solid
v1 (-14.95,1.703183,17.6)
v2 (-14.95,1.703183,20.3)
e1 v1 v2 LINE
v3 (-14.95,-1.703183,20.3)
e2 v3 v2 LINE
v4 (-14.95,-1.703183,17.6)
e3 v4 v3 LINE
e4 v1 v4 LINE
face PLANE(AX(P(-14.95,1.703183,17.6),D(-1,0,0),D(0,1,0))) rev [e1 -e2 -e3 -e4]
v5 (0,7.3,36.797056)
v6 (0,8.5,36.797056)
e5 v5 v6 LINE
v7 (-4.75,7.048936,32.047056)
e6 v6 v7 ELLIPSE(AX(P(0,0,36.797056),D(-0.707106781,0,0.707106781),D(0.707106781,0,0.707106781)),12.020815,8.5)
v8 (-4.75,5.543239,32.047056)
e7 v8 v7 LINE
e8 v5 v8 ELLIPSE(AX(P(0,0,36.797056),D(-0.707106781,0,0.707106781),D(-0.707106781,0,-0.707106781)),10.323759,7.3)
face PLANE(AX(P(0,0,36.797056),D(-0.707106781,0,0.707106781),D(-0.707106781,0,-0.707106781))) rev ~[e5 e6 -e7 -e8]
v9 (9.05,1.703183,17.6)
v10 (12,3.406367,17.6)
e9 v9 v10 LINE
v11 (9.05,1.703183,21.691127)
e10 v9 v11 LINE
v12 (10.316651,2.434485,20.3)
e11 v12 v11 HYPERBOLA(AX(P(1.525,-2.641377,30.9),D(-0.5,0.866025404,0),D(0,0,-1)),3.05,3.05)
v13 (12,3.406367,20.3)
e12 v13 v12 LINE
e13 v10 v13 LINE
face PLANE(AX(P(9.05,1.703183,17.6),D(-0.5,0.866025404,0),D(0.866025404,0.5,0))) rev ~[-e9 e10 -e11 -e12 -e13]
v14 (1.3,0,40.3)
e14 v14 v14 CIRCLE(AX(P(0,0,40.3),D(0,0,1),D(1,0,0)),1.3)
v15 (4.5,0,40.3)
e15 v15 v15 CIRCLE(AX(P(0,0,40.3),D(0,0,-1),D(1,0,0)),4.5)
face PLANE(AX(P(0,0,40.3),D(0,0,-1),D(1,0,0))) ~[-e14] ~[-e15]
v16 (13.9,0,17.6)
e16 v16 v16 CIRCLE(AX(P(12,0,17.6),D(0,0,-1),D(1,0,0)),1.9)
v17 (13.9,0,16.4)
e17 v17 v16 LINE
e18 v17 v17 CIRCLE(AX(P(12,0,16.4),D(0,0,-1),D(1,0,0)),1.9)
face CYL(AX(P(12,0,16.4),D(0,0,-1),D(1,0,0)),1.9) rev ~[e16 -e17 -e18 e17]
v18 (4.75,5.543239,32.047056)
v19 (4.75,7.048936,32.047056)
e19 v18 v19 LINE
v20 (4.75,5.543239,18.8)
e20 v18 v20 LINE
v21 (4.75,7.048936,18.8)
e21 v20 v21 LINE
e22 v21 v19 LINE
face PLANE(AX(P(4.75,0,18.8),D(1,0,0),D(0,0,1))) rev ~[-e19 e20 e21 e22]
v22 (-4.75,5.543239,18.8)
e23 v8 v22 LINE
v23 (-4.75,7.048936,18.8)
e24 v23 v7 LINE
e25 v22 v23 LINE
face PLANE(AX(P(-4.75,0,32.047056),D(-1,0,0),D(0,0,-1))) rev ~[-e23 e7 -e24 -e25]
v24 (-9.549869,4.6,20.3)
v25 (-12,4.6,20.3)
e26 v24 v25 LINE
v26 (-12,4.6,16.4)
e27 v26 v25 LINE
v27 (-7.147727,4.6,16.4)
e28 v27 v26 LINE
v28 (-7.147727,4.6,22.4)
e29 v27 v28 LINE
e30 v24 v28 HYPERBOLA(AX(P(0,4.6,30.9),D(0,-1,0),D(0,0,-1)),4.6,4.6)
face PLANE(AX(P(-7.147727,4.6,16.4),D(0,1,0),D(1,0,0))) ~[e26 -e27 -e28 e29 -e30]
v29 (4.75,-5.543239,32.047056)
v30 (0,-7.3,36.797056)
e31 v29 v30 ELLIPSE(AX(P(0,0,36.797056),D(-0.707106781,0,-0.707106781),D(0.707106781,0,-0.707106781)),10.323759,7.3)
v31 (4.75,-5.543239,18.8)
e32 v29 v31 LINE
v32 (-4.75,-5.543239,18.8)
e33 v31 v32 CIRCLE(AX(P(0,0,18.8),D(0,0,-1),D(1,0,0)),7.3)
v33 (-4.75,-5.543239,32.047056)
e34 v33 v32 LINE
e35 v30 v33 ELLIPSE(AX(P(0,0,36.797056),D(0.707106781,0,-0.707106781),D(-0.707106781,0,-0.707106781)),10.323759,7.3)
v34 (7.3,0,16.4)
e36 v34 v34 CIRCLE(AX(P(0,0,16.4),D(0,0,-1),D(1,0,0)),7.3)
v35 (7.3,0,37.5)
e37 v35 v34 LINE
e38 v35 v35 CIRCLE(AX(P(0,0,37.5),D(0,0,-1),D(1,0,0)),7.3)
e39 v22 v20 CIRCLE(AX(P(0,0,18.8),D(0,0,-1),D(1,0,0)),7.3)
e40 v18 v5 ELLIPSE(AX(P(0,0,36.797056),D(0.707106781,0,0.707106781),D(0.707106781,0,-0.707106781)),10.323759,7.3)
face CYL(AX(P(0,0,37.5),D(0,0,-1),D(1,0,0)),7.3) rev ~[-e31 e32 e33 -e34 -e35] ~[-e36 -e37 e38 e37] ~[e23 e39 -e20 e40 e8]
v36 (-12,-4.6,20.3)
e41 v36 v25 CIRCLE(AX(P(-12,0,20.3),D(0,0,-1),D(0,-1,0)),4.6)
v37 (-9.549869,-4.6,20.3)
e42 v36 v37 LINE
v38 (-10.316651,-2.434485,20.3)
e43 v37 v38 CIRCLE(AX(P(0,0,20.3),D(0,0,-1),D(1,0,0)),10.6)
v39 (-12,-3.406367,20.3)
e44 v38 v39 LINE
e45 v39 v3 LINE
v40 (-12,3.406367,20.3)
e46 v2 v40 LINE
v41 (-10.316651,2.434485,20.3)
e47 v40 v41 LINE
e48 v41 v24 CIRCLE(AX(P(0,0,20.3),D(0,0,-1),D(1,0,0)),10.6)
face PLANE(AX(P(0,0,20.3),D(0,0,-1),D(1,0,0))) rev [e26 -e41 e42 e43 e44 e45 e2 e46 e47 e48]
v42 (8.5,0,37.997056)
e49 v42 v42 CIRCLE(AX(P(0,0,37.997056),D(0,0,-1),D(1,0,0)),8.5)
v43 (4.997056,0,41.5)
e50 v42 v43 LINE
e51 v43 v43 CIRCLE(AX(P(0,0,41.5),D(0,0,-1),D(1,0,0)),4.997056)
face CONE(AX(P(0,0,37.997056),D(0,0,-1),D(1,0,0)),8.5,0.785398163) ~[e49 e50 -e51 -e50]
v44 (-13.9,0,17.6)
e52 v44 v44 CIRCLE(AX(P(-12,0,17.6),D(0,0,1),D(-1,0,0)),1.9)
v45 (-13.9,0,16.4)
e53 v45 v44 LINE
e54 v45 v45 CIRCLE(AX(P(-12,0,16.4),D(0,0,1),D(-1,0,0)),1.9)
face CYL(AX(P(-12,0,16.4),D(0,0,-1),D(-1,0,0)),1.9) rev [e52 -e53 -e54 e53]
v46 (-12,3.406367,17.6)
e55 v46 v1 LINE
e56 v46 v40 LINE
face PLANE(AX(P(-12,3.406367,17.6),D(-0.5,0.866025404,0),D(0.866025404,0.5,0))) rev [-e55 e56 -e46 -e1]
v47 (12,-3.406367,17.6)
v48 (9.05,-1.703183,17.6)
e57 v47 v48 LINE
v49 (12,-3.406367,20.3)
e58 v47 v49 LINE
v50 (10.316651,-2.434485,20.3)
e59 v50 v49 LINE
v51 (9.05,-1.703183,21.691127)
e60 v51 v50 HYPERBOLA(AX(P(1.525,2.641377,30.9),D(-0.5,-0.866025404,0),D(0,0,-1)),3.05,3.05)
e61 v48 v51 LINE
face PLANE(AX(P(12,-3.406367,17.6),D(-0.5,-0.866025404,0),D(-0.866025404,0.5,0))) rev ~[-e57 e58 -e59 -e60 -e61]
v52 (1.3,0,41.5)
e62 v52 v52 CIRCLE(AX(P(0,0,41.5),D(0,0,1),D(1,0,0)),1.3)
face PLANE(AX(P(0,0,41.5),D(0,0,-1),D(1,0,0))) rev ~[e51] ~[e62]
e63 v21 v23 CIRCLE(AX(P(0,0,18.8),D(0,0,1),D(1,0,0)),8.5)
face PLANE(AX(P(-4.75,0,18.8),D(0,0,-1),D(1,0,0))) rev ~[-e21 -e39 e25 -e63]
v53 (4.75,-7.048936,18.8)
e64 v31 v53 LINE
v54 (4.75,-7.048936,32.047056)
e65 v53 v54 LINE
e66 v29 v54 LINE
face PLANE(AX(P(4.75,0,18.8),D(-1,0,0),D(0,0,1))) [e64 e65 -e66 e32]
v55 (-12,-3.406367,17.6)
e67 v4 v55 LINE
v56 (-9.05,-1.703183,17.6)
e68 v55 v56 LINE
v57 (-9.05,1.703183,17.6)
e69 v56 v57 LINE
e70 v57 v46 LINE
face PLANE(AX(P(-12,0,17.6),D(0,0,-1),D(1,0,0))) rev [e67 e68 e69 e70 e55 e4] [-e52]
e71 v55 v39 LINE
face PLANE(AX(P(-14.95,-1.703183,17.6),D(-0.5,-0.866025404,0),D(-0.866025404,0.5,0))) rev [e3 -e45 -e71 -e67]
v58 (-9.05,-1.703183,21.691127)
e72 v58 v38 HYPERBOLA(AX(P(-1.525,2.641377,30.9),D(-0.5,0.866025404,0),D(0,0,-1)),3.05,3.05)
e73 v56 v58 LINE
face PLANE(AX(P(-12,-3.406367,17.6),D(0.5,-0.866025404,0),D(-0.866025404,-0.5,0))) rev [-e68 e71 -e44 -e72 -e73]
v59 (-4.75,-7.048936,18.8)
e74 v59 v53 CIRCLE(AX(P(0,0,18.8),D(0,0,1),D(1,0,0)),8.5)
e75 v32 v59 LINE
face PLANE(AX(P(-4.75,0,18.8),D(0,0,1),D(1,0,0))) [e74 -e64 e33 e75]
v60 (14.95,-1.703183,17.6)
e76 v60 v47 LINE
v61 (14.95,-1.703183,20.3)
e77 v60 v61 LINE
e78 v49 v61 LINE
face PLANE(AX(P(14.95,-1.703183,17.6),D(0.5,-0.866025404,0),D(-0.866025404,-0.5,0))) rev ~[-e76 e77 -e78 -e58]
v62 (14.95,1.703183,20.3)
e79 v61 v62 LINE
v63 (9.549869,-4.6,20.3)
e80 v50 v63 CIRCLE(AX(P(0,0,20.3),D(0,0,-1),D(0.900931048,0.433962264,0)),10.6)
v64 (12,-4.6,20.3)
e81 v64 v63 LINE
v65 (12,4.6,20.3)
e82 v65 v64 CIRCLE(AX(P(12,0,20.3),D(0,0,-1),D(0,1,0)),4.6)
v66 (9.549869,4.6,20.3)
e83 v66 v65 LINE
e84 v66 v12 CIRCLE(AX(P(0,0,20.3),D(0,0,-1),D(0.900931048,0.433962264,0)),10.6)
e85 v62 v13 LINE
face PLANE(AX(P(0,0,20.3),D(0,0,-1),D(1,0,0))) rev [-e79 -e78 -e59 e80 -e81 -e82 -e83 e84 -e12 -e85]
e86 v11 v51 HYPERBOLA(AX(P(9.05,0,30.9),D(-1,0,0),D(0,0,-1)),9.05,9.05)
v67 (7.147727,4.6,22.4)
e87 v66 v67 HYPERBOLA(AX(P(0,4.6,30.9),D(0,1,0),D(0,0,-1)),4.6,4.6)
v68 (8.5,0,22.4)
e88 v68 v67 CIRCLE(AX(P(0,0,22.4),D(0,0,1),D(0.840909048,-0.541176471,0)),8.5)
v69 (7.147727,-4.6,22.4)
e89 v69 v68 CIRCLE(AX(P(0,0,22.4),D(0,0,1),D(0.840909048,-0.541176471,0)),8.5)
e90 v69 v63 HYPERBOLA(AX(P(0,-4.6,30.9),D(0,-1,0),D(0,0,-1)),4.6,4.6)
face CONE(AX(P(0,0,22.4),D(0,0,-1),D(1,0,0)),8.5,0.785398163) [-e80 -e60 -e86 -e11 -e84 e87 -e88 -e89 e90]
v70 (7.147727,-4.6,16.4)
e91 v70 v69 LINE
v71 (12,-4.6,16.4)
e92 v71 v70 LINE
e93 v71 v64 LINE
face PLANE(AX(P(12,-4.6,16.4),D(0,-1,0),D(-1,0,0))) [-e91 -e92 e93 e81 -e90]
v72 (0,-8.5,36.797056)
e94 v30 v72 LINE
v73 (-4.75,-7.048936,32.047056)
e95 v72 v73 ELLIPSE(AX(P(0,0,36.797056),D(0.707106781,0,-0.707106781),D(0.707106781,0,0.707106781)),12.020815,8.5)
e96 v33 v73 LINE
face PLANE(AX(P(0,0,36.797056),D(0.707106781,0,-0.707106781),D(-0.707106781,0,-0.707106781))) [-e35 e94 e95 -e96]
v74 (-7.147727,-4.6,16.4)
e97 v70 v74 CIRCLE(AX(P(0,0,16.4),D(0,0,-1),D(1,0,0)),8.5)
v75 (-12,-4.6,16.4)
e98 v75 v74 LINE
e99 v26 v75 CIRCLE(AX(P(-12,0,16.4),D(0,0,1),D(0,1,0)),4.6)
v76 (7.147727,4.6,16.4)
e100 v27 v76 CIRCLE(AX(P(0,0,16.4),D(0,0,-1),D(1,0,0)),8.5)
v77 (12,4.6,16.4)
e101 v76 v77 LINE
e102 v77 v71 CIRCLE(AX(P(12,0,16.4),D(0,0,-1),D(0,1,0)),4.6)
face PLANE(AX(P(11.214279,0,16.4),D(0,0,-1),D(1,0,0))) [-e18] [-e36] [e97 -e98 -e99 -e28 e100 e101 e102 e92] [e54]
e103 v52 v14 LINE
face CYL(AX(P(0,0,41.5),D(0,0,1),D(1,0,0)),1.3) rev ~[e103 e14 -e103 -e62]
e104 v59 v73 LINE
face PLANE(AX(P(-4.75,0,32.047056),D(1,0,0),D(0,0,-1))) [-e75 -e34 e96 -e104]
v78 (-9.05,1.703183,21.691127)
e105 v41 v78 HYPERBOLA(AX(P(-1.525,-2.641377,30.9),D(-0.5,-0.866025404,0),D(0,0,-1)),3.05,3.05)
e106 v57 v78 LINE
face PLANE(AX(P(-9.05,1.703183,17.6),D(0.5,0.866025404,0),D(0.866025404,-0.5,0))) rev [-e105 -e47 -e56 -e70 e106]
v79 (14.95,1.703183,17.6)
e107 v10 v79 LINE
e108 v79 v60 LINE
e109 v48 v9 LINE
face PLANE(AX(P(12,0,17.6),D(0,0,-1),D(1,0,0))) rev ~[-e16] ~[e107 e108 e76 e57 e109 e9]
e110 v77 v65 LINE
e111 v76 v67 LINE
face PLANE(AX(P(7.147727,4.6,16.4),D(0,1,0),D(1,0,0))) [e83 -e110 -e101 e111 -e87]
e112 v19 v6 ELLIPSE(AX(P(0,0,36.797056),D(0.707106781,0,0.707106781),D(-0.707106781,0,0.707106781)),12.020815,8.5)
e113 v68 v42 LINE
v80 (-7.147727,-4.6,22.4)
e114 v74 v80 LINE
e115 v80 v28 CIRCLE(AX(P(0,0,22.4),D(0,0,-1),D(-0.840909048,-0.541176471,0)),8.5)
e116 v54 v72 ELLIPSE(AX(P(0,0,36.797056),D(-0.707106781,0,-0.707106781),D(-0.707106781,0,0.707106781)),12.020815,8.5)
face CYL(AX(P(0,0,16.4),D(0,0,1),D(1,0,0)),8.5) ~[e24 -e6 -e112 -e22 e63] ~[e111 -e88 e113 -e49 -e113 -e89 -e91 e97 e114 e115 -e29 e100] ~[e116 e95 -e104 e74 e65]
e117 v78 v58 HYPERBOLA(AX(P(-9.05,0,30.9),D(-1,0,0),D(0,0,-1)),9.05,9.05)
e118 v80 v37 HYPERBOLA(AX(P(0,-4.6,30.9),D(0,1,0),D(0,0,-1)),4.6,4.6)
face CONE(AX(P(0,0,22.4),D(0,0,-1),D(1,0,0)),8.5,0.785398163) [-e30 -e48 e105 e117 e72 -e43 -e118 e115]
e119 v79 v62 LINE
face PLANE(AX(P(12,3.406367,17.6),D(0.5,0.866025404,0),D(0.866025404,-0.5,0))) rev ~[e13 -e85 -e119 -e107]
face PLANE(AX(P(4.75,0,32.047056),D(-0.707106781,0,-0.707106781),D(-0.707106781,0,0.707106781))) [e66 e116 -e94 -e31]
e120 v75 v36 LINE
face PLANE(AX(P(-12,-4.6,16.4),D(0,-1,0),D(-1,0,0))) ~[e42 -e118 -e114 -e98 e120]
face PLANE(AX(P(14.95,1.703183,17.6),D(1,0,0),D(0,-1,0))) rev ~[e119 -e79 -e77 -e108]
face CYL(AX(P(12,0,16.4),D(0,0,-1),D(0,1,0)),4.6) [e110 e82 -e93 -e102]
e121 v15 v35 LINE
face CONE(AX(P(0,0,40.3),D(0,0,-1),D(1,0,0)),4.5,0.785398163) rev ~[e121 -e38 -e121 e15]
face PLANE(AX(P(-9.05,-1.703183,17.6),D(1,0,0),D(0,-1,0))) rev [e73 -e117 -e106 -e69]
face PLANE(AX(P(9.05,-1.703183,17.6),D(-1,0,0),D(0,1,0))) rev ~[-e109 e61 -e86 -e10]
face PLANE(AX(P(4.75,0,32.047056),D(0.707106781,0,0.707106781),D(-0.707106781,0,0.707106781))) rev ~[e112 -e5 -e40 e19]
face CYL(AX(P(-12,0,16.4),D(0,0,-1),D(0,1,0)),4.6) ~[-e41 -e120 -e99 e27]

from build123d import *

# Parameters (mm, degrees)
F4_DEPTH       = 6
F9_DEPTH       = 4.251
F10_R          = 1.9
F11_DEPTH      = 1.2
F13_DEPTH      = 8.501
F13_DEPTH_BACK = 8.501
F15_R          = 1.3
F16_DEPTH      = 1.2


# Not quite as in the source:
# - a pattern or mirror of a feature is missing from the dataset's text; its kind, count and spacing are read off the source's solid


with BuildPart() as f2:
    # F1 (on Front) → F2 (revolve)
    with BuildSketch(Plane.XZ):
        Polygon((7.3, 37.5), (7.3, 16.4), (8.5, 16.4), (8.5, 37.9970562748), (4.9970562748, 41.5), (0, 41.5), (0, 40.3), (4.5, 40.3), align=None)
    revolve(axis=Axis((0, 0, 13.2), (0, 0, -1)))

    # F3 (on face) → F4 (join)
    with BuildSketch(Plane(origin=(0, 0, 16.4), x_dir=(1, 0, 0), z_dir=(0, 0, -1))):
        with BuildLine():
            Line((7.1477269114, -4.6), (12, -4.6))
            ThreePointArc((12, -4.6), (16.6, 0), (12, 4.6))
            Line((12, 4.6), (7.1477269114, 4.6))
            ThreePointArc((7.1477269114, 4.6), (8.5, 0), (7.1477269114, -4.6))
        make_face()
    f4 = extrude(amount=-F4_DEPTH)

    # F4_copies: F4 across plane
    add(f4.mirror(Plane(origin=(0, 0, 0), x_dir=(0, 0, -1), z_dir=(-1, 0, 0))))

    # F7 (on Front) → F8 (revolve, cut)
    with BuildSketch(Plane.XZ):
        Polygon((8.5, 22.4), (10.6, 20.3), (16.6, 20.3), (16.6, 22.4), align=None)
    revolve(axis=Axis((0, 0, 13.2), (0, 0, -1)), mode=Mode.SUBTRACT)

    # F6 (on offset) → F9 (cut, through all)
    with BuildSketch(Plane(origin=(0, 0, 17.6), x_dir=(1, 0, 0), z_dir=(0, 0, -1))):
        Polygon((12, -3.4063665882), (14.95, -1.7031832941), (14.95, 1.7031832941), (12, 3.4063665882), (9.05, 1.7031832941), (9.05, -1.7031832941), align=None)
    f9 = extrude(amount=-F9_DEPTH, mode=Mode.SUBTRACT)

    # F9_copies: F9 across plane
    add(f9.mirror(Plane(origin=(0, 0, 0), x_dir=(0, 0, -1), z_dir=(-1, 0, 0))), mode=Mode.SUBTRACT)

    # F10 (on face) → F11 (cut, through all)
    with BuildSketch(Plane(origin=(0, 0, 16.4), x_dir=(1, 0, 0), z_dir=(0, 0, -1))):
        with Locations((12, 0)):
            Circle(F10_R)
    f11 = extrude(amount=-F11_DEPTH, mode=Mode.SUBTRACT)

    # F11_copies: F11 across plane
    add(f11.mirror(Plane(origin=(0, 0, 0), x_dir=(0, 0, -1), z_dir=(-1, 0, 0))), mode=Mode.SUBTRACT)

    # F12 (on Front) → F13 (cut, two sides)
    with BuildSketch(Plane.XZ) as f13_sk:
        Polygon((-4.75, 32.0470562748), (-4.75, 18.8), (4.75, 18.8), (4.75, 32.0470562748), (0, 36.7970562748), align=None)
    extrude(amount=-F13_DEPTH, mode=Mode.SUBTRACT)
    extrude(f13_sk.sketch, amount=F13_DEPTH_BACK, mode=Mode.SUBTRACT)

    # F15 (on face) → F16 (cut, through all)
    with BuildSketch(Plane.XY.offset(41.5)):
        Circle(F15_R)
    extrude(amount=-F16_DEPTH, mode=Mode.SUBTRACT)


solid = f2.part
